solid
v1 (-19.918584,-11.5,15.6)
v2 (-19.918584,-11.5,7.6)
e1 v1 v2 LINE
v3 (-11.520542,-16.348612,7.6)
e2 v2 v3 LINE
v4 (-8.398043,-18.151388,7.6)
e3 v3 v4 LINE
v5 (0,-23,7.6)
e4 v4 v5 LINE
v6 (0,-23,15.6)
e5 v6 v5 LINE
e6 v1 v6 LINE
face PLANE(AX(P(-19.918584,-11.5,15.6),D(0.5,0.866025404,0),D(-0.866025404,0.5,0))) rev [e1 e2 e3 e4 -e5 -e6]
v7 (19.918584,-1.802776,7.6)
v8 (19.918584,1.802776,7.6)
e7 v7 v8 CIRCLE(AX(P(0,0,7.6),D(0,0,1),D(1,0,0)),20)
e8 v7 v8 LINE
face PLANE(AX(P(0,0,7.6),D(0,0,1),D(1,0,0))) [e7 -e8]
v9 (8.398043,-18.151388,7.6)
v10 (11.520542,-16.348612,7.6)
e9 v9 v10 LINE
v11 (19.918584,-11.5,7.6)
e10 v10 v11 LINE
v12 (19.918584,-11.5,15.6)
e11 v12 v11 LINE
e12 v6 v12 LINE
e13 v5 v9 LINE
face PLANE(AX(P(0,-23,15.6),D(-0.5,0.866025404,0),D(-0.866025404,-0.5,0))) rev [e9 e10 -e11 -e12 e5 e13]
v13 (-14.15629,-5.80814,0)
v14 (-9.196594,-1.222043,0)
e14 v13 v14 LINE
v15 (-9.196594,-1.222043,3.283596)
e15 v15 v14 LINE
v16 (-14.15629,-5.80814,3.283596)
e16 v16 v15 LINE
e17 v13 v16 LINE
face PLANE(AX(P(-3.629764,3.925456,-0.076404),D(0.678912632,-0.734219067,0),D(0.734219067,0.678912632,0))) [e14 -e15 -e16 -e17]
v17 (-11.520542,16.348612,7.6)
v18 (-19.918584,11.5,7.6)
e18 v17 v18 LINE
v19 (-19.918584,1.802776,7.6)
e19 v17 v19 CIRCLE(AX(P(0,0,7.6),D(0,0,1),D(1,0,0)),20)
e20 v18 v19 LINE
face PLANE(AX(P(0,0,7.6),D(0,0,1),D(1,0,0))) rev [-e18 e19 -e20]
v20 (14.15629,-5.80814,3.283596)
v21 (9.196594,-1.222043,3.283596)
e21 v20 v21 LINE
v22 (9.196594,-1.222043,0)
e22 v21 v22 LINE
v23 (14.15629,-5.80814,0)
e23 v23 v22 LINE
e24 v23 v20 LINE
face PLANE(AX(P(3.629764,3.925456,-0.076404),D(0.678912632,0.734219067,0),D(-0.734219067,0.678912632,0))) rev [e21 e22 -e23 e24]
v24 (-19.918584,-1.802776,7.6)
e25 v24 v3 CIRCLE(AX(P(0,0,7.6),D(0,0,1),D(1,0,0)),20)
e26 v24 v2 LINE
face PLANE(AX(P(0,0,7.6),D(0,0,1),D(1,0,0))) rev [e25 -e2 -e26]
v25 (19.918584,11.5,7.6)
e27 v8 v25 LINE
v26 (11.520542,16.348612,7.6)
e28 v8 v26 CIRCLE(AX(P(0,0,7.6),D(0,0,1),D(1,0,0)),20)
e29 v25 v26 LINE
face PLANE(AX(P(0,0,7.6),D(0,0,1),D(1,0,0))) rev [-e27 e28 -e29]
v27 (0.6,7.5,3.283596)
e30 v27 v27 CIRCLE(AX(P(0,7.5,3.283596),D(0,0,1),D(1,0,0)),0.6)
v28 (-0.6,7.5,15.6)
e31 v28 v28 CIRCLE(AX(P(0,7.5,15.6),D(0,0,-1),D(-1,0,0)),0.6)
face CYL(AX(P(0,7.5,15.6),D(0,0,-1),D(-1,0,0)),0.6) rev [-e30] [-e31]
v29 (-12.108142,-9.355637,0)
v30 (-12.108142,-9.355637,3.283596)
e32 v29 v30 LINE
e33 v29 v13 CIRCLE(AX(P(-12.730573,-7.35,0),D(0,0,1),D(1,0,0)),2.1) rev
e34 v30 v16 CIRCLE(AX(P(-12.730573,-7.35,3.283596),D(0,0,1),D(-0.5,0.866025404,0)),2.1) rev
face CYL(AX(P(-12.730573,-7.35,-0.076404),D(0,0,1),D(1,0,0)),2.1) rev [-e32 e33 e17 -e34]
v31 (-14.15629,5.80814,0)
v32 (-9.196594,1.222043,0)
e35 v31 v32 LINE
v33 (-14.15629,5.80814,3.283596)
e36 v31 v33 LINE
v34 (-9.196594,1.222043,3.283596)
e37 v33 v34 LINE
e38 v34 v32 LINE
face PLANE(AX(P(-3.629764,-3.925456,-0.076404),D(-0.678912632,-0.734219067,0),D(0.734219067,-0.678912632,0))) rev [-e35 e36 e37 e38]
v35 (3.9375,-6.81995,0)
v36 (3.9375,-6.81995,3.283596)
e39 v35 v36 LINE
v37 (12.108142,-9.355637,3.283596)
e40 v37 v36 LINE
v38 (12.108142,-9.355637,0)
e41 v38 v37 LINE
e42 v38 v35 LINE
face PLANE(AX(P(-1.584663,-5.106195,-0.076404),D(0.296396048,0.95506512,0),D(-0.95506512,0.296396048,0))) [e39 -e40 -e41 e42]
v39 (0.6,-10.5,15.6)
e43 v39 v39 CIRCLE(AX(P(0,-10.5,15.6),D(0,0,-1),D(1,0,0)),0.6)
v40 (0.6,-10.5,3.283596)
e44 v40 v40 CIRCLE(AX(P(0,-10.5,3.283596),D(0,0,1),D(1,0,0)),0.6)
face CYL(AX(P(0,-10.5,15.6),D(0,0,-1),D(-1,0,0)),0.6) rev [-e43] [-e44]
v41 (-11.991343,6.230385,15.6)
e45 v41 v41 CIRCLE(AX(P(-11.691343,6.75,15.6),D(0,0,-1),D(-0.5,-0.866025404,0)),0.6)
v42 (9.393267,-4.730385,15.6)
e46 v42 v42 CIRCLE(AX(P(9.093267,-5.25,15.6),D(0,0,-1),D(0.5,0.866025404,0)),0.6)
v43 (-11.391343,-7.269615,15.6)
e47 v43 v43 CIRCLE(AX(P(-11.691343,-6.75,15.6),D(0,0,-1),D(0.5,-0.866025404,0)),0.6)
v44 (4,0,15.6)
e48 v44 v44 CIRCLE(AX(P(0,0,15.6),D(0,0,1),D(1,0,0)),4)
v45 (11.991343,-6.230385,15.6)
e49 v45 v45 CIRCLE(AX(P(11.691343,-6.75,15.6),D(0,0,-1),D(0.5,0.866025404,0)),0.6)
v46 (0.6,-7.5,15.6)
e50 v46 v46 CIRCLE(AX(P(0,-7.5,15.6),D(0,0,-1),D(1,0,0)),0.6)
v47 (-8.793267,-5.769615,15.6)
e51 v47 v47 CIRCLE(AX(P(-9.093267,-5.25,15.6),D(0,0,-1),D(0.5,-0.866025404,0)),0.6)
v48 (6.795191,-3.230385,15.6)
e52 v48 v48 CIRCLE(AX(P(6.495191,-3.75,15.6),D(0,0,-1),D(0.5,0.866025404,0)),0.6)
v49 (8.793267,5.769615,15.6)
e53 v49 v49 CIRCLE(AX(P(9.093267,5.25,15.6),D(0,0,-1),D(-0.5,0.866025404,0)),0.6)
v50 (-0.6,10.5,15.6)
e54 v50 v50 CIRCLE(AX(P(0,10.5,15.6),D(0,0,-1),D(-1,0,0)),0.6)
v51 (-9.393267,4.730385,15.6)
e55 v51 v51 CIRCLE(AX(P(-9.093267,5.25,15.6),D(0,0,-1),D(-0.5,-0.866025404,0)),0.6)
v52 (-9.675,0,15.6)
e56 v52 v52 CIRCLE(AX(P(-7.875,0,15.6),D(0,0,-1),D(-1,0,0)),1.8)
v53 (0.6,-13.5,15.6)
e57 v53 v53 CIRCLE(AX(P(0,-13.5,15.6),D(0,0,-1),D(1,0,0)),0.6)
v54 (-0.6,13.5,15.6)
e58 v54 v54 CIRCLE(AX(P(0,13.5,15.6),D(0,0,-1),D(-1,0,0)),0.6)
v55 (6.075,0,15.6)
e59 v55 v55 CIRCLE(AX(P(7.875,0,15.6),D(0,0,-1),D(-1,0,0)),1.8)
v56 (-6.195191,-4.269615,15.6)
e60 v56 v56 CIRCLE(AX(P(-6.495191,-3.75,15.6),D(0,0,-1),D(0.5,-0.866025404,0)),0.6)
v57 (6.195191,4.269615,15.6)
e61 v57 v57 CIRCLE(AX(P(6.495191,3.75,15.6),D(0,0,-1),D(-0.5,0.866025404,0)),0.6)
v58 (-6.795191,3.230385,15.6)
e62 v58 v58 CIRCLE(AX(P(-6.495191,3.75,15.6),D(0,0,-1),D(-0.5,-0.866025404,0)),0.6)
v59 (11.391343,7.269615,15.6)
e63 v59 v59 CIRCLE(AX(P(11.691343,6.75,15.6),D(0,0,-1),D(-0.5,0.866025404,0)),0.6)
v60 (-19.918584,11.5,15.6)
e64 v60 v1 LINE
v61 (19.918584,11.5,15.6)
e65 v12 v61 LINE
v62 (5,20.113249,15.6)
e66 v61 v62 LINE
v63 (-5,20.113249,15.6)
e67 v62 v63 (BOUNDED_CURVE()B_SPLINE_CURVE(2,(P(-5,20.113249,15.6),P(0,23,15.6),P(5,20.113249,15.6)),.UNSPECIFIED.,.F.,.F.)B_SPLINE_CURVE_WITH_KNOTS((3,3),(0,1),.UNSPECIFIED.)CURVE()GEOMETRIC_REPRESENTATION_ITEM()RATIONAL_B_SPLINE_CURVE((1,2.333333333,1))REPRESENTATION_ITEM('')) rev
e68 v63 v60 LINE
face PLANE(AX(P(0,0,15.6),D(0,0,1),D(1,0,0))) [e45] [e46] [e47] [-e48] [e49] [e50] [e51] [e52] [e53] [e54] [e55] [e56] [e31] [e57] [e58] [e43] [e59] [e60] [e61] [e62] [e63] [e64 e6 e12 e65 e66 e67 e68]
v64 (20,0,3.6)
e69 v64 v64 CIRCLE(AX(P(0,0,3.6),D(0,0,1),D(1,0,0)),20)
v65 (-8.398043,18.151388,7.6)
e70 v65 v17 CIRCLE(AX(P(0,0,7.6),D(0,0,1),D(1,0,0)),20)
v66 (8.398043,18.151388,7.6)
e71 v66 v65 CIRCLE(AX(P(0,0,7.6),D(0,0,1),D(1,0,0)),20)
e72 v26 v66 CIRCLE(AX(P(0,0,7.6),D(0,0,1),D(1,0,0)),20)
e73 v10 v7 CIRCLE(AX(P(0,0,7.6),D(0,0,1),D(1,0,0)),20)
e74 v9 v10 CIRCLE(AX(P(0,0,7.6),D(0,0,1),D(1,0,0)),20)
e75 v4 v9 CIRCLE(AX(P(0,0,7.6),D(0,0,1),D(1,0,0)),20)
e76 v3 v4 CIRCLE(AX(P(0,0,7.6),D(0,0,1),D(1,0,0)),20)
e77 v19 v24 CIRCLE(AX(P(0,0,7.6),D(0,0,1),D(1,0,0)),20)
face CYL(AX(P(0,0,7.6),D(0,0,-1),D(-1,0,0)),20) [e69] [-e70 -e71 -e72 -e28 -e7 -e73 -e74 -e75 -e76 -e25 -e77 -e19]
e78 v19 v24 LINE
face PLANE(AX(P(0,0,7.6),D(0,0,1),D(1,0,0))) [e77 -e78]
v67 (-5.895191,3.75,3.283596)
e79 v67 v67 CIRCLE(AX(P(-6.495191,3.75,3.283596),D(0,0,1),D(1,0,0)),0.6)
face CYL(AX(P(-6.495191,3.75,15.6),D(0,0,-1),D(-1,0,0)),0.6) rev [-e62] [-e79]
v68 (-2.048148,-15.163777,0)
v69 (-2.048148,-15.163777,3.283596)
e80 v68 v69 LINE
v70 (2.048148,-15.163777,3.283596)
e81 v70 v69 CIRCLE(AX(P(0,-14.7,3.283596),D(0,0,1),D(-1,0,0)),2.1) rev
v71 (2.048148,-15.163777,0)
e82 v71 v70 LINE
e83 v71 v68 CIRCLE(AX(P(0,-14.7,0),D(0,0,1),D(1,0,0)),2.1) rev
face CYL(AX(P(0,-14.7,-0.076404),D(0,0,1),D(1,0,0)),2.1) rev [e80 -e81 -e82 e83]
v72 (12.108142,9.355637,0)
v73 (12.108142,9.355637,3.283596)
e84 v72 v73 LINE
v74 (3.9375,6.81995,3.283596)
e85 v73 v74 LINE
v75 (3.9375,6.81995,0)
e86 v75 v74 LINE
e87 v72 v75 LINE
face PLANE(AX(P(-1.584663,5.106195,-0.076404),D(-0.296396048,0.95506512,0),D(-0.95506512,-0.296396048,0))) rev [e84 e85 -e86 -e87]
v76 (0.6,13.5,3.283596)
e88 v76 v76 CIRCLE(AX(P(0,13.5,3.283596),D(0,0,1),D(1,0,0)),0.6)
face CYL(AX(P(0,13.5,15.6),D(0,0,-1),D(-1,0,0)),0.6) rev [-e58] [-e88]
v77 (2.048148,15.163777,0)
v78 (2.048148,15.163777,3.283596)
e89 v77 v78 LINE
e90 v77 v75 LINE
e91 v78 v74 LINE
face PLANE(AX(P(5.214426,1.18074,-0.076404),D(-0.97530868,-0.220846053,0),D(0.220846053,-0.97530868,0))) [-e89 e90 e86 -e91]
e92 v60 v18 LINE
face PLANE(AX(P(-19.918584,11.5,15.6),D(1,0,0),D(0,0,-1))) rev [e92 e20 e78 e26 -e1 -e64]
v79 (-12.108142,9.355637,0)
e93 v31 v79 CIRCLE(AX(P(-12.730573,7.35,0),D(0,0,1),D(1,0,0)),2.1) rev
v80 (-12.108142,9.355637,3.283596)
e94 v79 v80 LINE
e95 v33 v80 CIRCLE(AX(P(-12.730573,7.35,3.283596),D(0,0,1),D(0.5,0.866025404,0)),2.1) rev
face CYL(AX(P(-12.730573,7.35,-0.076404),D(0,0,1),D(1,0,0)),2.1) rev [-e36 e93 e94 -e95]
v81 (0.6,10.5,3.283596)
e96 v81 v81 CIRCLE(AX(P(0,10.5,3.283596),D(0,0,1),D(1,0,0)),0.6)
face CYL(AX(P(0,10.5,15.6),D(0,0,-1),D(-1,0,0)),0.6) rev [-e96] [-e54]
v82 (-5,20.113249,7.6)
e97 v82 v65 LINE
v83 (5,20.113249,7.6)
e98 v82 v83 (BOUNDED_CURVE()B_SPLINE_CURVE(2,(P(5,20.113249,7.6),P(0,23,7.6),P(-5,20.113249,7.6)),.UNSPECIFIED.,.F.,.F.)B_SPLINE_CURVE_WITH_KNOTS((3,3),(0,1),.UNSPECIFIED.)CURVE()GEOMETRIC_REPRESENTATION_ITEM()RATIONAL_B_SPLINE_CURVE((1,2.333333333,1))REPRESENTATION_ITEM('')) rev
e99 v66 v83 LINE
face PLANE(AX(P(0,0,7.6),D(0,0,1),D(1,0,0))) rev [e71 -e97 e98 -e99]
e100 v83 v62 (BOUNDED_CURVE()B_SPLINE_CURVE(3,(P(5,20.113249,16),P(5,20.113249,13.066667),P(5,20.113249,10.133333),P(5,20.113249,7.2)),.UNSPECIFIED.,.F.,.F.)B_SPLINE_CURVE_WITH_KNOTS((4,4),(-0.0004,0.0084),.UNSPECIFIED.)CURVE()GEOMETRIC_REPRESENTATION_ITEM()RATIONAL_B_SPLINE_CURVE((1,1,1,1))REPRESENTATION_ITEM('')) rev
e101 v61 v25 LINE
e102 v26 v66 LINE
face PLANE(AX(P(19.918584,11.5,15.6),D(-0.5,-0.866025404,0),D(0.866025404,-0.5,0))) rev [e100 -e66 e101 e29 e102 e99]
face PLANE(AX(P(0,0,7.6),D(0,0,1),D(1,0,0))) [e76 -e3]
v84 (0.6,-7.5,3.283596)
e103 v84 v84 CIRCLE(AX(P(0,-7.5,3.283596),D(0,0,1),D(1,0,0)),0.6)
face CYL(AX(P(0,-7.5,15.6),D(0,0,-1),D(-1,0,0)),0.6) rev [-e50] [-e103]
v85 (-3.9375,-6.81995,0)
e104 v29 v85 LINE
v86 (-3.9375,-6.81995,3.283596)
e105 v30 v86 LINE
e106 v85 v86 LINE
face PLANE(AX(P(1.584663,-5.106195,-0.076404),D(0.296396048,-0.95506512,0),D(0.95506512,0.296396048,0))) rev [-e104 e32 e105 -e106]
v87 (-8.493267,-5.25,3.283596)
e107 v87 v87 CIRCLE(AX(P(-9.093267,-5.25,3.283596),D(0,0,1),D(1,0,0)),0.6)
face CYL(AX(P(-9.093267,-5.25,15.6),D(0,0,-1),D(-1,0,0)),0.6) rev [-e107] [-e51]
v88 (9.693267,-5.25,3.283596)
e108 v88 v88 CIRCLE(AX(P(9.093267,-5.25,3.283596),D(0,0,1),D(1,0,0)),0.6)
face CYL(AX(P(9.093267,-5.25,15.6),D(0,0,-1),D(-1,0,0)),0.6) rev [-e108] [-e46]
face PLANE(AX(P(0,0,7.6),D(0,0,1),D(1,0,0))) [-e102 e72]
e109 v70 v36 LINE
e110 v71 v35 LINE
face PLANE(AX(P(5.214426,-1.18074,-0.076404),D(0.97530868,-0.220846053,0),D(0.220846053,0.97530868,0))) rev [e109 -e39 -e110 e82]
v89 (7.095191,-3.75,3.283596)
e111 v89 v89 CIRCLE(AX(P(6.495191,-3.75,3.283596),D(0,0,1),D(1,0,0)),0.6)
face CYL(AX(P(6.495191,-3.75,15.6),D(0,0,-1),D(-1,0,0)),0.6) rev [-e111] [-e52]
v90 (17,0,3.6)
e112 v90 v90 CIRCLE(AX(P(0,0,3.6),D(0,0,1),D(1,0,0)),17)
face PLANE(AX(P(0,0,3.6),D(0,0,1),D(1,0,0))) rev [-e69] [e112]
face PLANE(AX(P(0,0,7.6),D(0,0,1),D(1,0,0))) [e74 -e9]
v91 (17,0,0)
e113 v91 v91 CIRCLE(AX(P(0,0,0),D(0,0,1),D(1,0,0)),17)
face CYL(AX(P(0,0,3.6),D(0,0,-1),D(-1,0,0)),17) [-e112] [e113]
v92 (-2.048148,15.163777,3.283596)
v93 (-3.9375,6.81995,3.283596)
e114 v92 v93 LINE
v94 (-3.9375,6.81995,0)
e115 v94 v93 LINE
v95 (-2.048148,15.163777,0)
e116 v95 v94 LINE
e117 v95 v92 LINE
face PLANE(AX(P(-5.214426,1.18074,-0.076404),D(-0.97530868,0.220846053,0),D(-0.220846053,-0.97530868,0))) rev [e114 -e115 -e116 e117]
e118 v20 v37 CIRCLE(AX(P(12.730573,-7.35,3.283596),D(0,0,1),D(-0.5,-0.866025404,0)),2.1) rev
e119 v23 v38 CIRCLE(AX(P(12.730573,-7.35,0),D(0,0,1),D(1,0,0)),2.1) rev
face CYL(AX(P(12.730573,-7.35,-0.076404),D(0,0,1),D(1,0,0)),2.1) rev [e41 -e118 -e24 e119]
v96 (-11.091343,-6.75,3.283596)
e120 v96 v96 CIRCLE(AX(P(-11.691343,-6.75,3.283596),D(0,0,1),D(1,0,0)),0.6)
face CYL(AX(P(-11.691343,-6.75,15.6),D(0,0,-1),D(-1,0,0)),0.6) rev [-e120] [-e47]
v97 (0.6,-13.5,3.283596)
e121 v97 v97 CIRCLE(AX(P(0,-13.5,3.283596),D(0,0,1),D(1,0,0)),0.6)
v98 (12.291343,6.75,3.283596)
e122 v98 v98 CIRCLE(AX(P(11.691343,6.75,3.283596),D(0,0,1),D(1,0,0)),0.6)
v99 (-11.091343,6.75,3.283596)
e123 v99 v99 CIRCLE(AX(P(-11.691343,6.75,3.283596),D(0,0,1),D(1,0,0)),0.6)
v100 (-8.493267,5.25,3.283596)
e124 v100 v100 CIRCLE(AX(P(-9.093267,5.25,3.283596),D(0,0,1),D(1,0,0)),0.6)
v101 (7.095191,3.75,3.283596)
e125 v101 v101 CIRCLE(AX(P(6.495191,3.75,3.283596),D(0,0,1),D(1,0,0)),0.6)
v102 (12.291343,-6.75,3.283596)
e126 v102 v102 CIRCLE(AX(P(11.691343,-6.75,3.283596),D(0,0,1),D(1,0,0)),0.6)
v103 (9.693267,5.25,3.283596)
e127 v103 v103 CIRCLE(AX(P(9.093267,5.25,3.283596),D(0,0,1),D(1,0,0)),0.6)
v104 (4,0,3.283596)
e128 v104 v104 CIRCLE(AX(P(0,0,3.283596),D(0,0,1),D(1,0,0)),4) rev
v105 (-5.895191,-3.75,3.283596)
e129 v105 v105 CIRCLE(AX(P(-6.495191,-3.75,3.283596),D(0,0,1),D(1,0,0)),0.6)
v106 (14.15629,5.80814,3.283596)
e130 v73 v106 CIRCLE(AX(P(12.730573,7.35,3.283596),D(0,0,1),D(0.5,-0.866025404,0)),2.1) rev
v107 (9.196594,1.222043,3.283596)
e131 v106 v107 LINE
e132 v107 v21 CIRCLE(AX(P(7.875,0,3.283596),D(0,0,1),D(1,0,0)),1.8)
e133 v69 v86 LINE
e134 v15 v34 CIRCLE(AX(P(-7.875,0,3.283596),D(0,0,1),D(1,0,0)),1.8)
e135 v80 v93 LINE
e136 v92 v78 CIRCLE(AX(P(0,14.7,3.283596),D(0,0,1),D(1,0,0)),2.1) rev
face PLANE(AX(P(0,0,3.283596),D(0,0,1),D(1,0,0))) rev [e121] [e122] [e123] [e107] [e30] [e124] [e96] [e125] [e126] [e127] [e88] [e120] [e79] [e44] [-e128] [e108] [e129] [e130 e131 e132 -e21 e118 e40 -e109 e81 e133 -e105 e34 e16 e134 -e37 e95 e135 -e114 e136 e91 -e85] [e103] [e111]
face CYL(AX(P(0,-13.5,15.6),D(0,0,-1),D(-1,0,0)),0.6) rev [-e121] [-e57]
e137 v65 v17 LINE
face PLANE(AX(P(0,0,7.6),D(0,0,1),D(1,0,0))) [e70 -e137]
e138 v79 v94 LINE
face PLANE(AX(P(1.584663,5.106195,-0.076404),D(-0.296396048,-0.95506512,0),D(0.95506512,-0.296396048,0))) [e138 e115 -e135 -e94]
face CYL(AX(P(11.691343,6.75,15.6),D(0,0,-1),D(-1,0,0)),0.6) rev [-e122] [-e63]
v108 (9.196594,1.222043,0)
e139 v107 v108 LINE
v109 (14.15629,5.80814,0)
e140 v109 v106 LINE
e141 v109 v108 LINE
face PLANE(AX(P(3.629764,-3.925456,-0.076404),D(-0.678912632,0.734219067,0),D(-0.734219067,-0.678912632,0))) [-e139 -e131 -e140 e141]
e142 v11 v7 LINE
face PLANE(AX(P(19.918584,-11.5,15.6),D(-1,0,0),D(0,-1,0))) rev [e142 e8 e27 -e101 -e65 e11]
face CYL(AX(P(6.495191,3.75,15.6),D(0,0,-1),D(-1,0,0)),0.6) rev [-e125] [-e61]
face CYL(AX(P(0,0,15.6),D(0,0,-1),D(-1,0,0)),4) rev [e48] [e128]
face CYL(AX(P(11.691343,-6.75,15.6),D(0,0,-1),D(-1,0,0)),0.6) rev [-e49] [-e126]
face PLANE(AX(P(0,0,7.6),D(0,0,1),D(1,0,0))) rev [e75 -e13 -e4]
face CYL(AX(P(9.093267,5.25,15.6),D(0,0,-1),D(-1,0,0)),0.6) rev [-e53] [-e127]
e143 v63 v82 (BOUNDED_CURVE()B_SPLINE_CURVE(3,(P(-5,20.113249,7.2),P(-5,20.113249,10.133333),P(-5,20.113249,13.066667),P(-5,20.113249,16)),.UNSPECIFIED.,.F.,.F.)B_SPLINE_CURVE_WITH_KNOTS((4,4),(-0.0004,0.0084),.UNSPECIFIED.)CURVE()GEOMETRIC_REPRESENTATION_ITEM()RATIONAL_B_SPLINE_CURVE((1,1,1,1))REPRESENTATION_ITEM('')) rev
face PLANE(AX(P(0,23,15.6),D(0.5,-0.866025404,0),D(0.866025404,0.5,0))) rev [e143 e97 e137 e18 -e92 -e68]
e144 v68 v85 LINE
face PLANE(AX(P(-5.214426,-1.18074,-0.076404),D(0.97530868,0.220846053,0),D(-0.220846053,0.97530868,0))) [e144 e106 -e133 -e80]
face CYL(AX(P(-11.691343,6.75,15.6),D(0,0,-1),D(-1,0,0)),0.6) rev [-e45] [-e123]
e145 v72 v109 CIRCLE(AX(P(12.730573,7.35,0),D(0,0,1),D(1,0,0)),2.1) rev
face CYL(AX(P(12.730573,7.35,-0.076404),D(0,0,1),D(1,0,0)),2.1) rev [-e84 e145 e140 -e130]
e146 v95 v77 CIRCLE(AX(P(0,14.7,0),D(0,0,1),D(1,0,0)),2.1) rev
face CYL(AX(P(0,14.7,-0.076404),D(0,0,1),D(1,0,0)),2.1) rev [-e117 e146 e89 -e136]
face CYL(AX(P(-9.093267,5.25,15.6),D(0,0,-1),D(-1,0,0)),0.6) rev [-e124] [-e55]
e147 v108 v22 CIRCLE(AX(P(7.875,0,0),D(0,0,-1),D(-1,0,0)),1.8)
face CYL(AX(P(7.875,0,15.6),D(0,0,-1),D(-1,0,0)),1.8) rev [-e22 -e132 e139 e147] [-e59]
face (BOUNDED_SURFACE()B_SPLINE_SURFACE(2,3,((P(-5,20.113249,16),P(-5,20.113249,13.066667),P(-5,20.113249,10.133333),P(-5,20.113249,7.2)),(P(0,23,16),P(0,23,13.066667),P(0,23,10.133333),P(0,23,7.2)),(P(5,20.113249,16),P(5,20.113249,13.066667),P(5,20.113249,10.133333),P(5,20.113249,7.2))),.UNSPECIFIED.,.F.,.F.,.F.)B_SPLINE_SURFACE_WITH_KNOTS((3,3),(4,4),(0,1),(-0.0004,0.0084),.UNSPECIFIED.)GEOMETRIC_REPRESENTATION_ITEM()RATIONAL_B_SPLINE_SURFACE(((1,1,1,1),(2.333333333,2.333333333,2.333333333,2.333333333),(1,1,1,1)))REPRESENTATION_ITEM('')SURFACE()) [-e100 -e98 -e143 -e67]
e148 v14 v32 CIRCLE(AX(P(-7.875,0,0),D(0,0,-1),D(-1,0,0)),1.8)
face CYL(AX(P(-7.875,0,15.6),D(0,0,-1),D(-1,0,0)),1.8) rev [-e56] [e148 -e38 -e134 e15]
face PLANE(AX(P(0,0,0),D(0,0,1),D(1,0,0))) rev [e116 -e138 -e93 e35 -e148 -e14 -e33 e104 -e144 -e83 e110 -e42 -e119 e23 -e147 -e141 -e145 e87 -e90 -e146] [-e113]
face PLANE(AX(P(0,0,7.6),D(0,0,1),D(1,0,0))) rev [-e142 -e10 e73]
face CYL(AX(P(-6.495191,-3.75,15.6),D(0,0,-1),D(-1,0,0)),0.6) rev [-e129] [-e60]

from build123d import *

# Parameters (mm, degrees)
SKETCH1_R               = 17
BOSS_EXTRUDE1_DEPTH     = 3.6
CAVITY1_OUTLINE_R       = 3.15
CAVITY1_DEPTH           = 3.283595969
CAVITY1_START           = 1.183595969
CAVITY1_2_OUTLINE_R     = 3.15
CAVITY1_2_OUTLINE_R_2   = 1.575
CAVITY1_2_DEPTH         = 2.1
SKETCH9_R               = 20
BOSS_EXTRUDE3_DEPTH     = 4
BOSS_EXTRUDE8_DEPTH     = 8
SKETCH2_R               = 0.6
CUT_EXTRUDE1_DEPTH      = 35.23974299
CIRPATTERN1_COUNT       = 6
SKETCH3_R               = 4.596048158
CUT_EXTRUDE2_DEPTH      = 3.283595969
CUT_EXTRUDE3_DEPTH      = 35.23974299
CUT_EXTRUDE3_DEPTH_BACK = 4
SKETCH4_R               = 4
SKETCH6_R               = 1.8
CUT_EXTRUDE4_DEPTH      = 35.23974299


with BuildPart() as part:
    # Sketch1 → Boss-Extrude1 (new body)
    with BuildSketch(Plane.XY):
        Circle(SKETCH1_R)
    extrude(amount=BOSS_EXTRUDE1_DEPTH)

    # Cavity1: read off the stored shape, not the designer's step
    # Cavity1 outline → Cavity1 (cut)
    with BuildSketch(Plane.XY):
        with BuildLine():
            Line((3.9375, 6.819950055), (2.048148228, 15.163776711))
            ThreePointArc((2.048148228, 15.163776711), (0, 16.8), (-2.048148228, 15.163776711))
            Line((-2.048148228, 15.163776711), (-3.9375, 6.819950055))
            Line((-3.9375, 6.819950055), (-12.108141735, 9.355636751))
            ThreePointArc((-12.108141735, 9.355636751), (-14.549226784, 8.4), (-14.156289963, 5.80813996))
            Line((-14.156289963, 5.80813996), (-7.875, 0))
            Line((-7.875, 0), (-14.156289963, -5.80813996))
            ThreePointArc((-14.156289963, -5.80813996), (-14.549226784, -8.4), (-12.108141735, -9.355636751))
            Line((-12.108141735, -9.355636751), (-3.9375, -6.819950055))
            Line((-3.9375, -6.819950055), (-2.048148228, -15.163776711))
            ThreePointArc((-2.048148228, -15.163776711), (0, -16.8), (2.048148228, -15.163776711))
            Line((2.048148228, -15.163776711), (3.9375, -6.819950055))
            Line((3.9375, -6.819950055), (12.108141735, -9.355636751))
            ThreePointArc((12.108141735, -9.355636751), (14.549226784, -8.4), (14.156289963, -5.80813996))
            Line((14.156289963, -5.80813996), (7.875, 0))
            Line((7.875, 0), (14.156289963, 5.80813996))
            ThreePointArc((14.156289963, 5.80813996), (14.549226784, 8.4), (12.108141735, 9.355636751))
            Line((12.108141735, 9.355636751), (3.9375, 6.819950055))
        make_face()
        Circle(CAVITY1_OUTLINE_R, mode=Mode.SUBTRACT)
    extrude(amount=CAVITY1_DEPTH, mode=Mode.SUBTRACT)

    # Cavity1 2 outline → Cavity1 2 (cut)
    with BuildSketch(Plane.XY.offset(CAVITY1_START)):
        Circle(CAVITY1_2_OUTLINE_R)
        Circle(CAVITY1_2_OUTLINE_R_2, mode=Mode.SUBTRACT)
    extrude(amount=CAVITY1_2_DEPTH, mode=Mode.SUBTRACT)

    # Sketch9 → Boss-Extrude3 (add)
    with BuildSketch(Plane.XY.offset(3.6)):
        Circle(SKETCH9_R)
    extrude(amount=BOSS_EXTRUDE3_DEPTH)

    # Sketch12 → Boss-Extrude8 (add)
    with BuildSketch(Plane.XY.offset(7.6)):
        Polygon((0, -23), (19.918584287, -11.5), (19.918584287, 11.5), (0, 23), (-19.918584287, 11.5), (-19.918584287, -11.5), align=None)
    extrude(amount=BOSS_EXTRUDE8_DEPTH)

    # Sketch2 → Cut-Extrude1 (cut, through all)
    with BuildSketch(Plane(origin=(0, 0, 0), x_dir=(-1, 0, 0), z_dir=(0, 0, -1))):
        with Locations((0, 13.5)):
            Circle(SKETCH2_R)
        with Locations((0, 10.5)):
            Circle(SKETCH2_R)
        with Locations((0, 7.5)):
            Circle(SKETCH2_R)
    cut_extrude1 = extrude(amount=-CUT_EXTRUDE1_DEPTH, mode=Mode.SUBTRACT)

    # CirPattern1: Cut-Extrude1 ×6 about axis
    cirpattern1_axis = Axis((0, 0, 0), (0, 0, 1))
    for i in range(1, CIRPATTERN1_COUNT):
        add(cut_extrude1.rotate(cirpattern1_axis, i * 360 / CIRPATTERN1_COUNT), mode=Mode.SUBTRACT)

    # Sketch3 → Cut-Extrude2 (cut)
    with BuildSketch(Plane(origin=(0, 0, 0), x_dir=(-1, 0, 0), z_dir=(0, 0, -1))):
        Circle(SKETCH3_R)
    extrude(amount=-CUT_EXTRUDE2_DEPTH, mode=Mode.SUBTRACT)

    # Sketch4 → Cut-Extrude3 (cut, two sides: drawn at the far end of the back side and taken through both)
    with BuildSketch(Plane.XY.offset(-CUT_EXTRUDE3_DEPTH_BACK)):
        Circle(SKETCH4_R)
    extrude(amount=CUT_EXTRUDE3_DEPTH + CUT_EXTRUDE3_DEPTH_BACK, mode=Mode.SUBTRACT)

    # Sketch6 → Cut-Extrude4 (cut, through all)
    with BuildSketch(Plane(origin=(0, 0, 0), x_dir=(-1, 0, 0), z_dir=(0, 0, -1))):
        with Locations((-7.875, 0)):
            Circle(SKETCH6_R)
        with Locations((7.875, 0)):
            Circle(SKETCH6_R)
    extrude(amount=-CUT_EXTRUDE4_DEPTH, mode=Mode.SUBTRACT)

    # Fillet1
    # a fillet whose section is not a circle: 10 mm, written as the material it takes off along each edge
    with BuildSketch(Plane(origin=(0, 23, -6.83375673), x_dir=(-0.8660254037844386, -0.5000000000000003, 0), z_dir=(0, 0, 1))) as fillet1_piece_1:
        with BuildLine():
            Bezier((5.773502692, 0), (0, 0), (-2.886751346, 5), weights=[1, 2.333333333, 1])
            Line((-2.886751346, 5), (0, 0))
            Line((0, 0), (5.773502692, 0))
        make_face()
    extrude(amount=36.867513459, mode=Mode.SUBTRACT)


solid = part.part
